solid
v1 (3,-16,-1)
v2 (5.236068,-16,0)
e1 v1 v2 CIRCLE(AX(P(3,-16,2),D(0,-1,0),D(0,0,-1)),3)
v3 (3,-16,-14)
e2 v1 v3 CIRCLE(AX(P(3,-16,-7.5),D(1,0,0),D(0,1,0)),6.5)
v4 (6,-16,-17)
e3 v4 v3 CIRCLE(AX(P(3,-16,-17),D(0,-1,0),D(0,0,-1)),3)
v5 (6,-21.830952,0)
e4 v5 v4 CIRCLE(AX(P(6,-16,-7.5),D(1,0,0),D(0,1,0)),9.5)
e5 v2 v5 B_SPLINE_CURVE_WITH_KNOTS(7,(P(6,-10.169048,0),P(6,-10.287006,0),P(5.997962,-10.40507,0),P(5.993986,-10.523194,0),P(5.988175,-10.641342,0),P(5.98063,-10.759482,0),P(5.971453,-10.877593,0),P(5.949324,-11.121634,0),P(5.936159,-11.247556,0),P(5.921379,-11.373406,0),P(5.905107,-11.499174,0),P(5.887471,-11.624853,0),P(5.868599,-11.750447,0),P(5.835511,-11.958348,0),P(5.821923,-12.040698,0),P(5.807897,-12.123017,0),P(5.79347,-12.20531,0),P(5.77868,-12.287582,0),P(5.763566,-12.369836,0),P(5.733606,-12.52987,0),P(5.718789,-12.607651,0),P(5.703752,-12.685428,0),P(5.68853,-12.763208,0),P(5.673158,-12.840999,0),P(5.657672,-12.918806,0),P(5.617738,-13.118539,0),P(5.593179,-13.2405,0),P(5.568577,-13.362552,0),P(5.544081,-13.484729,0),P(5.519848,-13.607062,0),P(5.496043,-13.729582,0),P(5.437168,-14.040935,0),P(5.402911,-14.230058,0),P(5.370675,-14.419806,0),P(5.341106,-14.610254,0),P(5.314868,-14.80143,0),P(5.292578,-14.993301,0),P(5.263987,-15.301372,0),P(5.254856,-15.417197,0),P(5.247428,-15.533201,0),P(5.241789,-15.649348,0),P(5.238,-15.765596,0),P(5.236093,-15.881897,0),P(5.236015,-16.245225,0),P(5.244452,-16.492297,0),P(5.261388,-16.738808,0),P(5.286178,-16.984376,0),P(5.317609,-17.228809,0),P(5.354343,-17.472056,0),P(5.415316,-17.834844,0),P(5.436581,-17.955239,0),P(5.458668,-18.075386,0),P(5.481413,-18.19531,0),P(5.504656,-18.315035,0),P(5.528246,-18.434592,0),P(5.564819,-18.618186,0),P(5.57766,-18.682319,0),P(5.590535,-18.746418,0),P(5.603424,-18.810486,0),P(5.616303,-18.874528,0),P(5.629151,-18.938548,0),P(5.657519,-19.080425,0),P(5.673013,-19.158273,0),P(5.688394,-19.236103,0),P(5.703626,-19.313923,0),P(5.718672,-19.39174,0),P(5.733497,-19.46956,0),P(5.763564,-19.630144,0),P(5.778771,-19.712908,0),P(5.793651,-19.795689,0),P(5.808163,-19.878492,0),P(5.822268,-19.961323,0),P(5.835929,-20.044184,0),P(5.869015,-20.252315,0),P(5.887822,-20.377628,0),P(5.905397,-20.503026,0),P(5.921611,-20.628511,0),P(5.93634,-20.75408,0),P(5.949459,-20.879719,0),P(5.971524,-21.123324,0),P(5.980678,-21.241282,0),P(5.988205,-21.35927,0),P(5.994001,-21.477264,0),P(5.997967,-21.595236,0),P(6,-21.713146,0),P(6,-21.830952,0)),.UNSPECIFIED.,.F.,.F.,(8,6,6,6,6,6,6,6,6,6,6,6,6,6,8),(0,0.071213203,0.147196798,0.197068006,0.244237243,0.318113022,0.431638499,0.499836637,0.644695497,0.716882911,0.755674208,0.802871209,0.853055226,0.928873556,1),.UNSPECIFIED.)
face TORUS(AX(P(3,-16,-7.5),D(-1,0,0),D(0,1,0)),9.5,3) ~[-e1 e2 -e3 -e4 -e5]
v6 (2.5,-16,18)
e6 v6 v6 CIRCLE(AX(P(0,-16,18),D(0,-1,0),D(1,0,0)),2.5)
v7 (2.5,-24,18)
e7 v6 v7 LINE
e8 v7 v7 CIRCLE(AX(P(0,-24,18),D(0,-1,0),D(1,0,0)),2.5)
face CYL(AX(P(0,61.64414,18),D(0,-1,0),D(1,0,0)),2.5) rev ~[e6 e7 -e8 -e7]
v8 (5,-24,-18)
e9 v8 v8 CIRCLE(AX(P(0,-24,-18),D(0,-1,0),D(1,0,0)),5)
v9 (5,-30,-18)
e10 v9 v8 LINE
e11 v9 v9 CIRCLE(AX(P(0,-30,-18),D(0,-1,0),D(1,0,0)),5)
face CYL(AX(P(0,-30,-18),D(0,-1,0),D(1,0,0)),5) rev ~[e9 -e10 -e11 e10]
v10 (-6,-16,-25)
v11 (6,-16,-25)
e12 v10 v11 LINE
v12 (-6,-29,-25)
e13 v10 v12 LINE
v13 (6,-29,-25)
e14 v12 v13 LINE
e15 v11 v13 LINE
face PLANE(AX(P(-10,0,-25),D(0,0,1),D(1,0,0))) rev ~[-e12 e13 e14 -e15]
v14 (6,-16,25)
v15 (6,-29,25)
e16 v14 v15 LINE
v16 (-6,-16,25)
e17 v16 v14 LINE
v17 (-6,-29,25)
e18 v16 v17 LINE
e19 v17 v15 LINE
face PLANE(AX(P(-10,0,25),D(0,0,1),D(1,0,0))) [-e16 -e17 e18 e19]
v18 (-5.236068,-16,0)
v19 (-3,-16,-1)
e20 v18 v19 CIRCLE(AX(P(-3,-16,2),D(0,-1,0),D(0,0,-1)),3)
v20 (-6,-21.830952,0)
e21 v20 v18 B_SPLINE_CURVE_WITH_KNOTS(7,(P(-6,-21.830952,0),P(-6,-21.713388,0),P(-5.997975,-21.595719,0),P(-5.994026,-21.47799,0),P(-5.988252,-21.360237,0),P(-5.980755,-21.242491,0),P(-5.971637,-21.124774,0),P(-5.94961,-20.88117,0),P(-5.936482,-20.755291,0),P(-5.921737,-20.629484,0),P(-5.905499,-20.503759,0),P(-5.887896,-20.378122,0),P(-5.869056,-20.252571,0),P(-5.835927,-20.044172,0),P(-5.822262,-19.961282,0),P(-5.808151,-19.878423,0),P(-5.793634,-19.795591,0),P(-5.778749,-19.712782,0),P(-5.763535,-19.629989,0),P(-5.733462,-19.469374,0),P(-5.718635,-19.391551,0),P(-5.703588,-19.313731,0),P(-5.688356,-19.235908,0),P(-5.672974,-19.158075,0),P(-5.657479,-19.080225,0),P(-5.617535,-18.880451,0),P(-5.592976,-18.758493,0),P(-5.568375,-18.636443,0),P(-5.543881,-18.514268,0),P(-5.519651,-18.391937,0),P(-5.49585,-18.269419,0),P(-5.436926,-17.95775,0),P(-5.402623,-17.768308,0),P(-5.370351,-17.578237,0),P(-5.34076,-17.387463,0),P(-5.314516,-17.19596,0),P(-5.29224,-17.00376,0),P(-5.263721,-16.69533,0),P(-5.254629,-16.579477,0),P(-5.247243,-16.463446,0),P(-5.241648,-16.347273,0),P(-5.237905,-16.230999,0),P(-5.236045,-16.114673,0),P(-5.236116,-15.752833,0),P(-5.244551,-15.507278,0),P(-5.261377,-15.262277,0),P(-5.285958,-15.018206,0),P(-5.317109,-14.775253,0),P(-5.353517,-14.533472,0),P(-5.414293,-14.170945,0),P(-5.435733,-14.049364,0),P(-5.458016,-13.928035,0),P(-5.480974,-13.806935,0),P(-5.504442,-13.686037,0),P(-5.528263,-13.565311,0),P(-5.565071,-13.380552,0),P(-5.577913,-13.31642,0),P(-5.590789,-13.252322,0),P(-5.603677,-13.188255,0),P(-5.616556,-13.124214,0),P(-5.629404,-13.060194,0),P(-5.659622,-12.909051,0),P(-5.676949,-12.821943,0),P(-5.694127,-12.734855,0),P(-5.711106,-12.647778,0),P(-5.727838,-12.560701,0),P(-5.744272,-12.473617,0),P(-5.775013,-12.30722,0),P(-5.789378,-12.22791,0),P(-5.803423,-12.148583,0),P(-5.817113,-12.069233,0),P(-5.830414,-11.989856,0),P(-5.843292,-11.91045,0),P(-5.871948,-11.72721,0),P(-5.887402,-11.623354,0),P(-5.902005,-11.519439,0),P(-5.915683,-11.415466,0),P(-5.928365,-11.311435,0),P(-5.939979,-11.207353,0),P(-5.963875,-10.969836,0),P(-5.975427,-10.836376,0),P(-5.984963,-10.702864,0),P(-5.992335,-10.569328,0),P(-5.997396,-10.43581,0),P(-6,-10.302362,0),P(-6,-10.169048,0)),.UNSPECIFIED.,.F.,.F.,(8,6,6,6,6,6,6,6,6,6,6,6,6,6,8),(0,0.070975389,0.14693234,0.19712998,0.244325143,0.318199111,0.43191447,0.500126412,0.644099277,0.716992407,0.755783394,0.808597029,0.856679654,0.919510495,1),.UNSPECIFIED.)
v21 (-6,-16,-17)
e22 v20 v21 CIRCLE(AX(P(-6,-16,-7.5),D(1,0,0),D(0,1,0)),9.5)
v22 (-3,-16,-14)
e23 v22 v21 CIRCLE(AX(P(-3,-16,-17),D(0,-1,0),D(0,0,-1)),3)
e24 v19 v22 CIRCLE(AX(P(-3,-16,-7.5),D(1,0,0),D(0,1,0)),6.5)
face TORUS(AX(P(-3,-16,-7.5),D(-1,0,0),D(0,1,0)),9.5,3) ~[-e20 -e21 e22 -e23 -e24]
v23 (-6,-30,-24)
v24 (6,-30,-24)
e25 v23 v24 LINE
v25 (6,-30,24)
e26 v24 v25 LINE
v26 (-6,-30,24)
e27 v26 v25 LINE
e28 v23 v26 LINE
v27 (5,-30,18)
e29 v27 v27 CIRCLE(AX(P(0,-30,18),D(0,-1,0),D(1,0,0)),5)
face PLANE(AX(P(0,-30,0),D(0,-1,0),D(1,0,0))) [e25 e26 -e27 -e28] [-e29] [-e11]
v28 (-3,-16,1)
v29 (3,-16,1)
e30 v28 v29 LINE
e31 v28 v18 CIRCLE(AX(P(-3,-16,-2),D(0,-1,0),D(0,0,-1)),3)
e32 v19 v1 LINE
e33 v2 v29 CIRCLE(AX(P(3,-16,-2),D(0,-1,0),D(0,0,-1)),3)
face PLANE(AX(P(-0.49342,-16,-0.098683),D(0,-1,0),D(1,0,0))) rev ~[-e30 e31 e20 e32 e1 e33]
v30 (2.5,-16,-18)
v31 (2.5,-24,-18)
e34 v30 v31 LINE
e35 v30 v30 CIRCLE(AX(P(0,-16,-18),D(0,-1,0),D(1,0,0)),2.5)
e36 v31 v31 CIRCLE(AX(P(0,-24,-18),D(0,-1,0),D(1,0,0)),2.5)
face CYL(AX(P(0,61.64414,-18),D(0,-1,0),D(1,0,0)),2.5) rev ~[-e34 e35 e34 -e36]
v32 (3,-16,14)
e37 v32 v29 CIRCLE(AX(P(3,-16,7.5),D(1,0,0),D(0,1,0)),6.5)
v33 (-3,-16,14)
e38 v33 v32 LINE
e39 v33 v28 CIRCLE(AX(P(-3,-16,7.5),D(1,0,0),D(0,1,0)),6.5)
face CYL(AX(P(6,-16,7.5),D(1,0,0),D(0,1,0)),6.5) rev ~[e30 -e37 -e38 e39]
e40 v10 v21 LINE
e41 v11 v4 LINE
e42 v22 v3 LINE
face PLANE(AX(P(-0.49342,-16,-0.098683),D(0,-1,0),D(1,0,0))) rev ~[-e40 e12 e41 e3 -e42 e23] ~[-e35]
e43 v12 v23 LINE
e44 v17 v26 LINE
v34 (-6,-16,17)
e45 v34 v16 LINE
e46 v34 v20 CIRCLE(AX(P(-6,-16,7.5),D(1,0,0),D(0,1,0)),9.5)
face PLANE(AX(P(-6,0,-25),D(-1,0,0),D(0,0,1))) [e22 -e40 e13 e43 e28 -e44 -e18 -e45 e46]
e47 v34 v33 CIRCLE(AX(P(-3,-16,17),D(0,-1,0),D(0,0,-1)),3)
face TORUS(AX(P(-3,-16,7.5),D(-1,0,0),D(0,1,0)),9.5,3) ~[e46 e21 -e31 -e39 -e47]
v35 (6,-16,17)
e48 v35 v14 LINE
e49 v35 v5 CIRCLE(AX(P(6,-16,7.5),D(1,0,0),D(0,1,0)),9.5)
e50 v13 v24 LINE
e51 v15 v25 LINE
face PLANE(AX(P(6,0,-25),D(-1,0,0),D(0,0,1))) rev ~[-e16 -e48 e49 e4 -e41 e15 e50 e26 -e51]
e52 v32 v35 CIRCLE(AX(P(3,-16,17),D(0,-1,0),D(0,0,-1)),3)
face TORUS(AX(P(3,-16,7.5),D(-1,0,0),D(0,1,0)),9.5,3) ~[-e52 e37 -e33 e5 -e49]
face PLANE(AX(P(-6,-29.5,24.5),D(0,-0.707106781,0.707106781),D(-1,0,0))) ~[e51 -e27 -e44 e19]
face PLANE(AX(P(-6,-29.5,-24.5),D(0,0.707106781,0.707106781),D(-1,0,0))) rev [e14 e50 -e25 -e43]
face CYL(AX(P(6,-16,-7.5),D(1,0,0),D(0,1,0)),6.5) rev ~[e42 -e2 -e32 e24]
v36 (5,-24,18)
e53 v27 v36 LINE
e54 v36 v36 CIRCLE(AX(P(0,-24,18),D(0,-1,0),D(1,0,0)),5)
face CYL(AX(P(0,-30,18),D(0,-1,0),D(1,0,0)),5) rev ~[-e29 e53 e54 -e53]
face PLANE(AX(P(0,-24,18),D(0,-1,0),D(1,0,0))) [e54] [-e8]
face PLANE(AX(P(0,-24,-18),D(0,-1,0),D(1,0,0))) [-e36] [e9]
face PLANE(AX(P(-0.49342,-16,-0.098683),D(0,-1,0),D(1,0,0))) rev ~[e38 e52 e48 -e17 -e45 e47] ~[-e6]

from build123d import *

# Parameters (mm, degrees)
F0_W      = 12
F0_H      = 50
F1_DEPTH  = 30
F2_R      = 6.5
F3_DEPTH  = 12.001
F4_W      = 20
F4_H      = 50
F5_DEPTH  = 2
F8_D      = 5
F9_W      = 10
F9_H      = 20
F10_DEPTH = 8
F11_R     = 5
F12_DEPTH = 6
F13_SIZE  = 1
F15_W     = 41.8421067297
F15_H     = 67.5000026822
F16_DEPTH = 25


# Not quite as in the source:
# - a fillet or chamfer that OpenCascade refuses, or shapes differently, is made with other operations: its cross-section is extruded or revolved along the edge and cut away or added


with BuildPart() as f1:
    # F0 (on Front) → F1 (new body)
    with BuildSketch(Plane.XZ):
        Rectangle(F0_W, F0_H)
    extrude(amount=F1_DEPTH)

    # F2 (on face) → F3 (cut, through all)
    with BuildSketch(Plane.YZ.offset(6)):
        with Locations((-16, 7.5)):
            Circle(F2_R)
        with Locations((-16, -7.5)):
            Circle(F2_R)
    extrude(amount=-F3_DEPTH, mode=Mode.SUBTRACT)

    # F4 (on Front) → F5 (join)
    with BuildSketch(Plane.XZ):
        Rectangle(F4_W, F4_H)
    extrude(amount=F5_DEPTH)

    # F6: fillet of radius 3 on 4 edges, made by hand

    # F6_s1 → F6_t2 (revolve, cut)
    with BuildSketch(Plane.XY.offset(7.5)):
        with BuildLine():
            ThreePointArc((-6, -6.5), (-5.1213203436, -8.6213203436), (-3, -9.5))
            Line((-3, -9.5), (-6, -9.5))
            Line((-6, -9.5), (-6, -6.5))
        make_face()
    revolve(axis=Axis((-6, -16, 7.5), (1, 0, 0)), mode=Mode.SUBTRACT)

    # F6_s3 → F6_t4 (revolve, cut)
    with BuildSketch(Plane.XY.offset(-7.5)):
        with BuildLine():
            ThreePointArc((-6, -6.5), (-5.1213203436, -8.6213203436), (-3, -9.5))
            Line((-3, -9.5), (-6, -9.5))
            Line((-6, -9.5), (-6, -6.5))
        make_face()
    revolve(axis=Axis((-6, -16, -7.5), (1, 0, 0)), mode=Mode.SUBTRACT)

    # F6_s5 → F6_t6 (revolve, cut)
    with BuildSketch(Plane.XY.offset(7.5)):
        with BuildLine():
            ThreePointArc((3, -9.5), (5.1213203436, -8.6213203436), (6, -6.5))
            Line((6, -6.5), (6, -9.5))
            Line((6, -9.5), (3, -9.5))
        make_face()
    revolve(axis=Axis((6, -16, 7.5), (1, 0, 0)), mode=Mode.SUBTRACT)

    # F6_s7 → F6_t8 (revolve, cut)
    with BuildSketch(Plane.XY.offset(-7.5)):
        with BuildLine():
            ThreePointArc((3, -9.5), (5.1213203436, -8.6213203436), (6, -6.5))
            Line((6, -6.5), (6, -9.5))
            Line((6, -9.5), (3, -9.5))
        make_face()
    revolve(axis=Axis((6, -16, -7.5), (1, 0, 0)), mode=Mode.SUBTRACT)

    # F8 (through all)
    with Locations(Plane(origin=(0, 0, 0), x_dir=(-1, 0, 0), z_dir=(0, 1, 0))):
        with Locations((0, 18), (0, -18)):
            Hole(F8_D / 2)

    # F9 (on face) → F10 (cut)
    with BuildSketch(Plane(origin=(0, 0, 0), x_dir=(-1, 0, 0), z_dir=(0, 1, 0))):
        Polygon((0, 12.1110272543), (5.1, 15.0555136271), (5.1, 20.9444863729), (0, 23.8889727457), (-5.1, 20.9444863729), (-5.1, 15.0555136271), align=None)
        Rectangle(F9_W, F9_H)
        Polygon((5.1, -20.9444863729), (5.1, -15.0555136271), (0, -12.1110272543), (-5.1, -15.0555136271), (-5.1, -20.9444863729), (0, -23.8889727457), align=None)
    extrude(amount=-F10_DEPTH, mode=Mode.SUBTRACT)

    # F11 (on face) → F12 (cut)
    with BuildSketch(Plane.XZ.offset(30)):
        with Locations((0, 18)):
            Circle(F11_R)
        with Locations((0, -18)):
            Circle(F11_R)
    extrude(amount=-F12_DEPTH, mode=Mode.SUBTRACT)

    # F13
    f13_edges = [f1.edges().sort_by_distance(p)[0] for p in [
        (0, -30, -25),
        (0, -30, 25),
    ]]
    chamfer(f13_edges, length=F13_SIZE)

    # F15 (on offset) → F16 (cut)
    with BuildSketch(Plane.XZ.offset(16)):
        with Locations((-0.493420288, -0.09868294)):
            Rectangle(F15_W, F15_H)
    extrude(amount=-F16_DEPTH, mode=Mode.SUBTRACT)


solid = f1.part
